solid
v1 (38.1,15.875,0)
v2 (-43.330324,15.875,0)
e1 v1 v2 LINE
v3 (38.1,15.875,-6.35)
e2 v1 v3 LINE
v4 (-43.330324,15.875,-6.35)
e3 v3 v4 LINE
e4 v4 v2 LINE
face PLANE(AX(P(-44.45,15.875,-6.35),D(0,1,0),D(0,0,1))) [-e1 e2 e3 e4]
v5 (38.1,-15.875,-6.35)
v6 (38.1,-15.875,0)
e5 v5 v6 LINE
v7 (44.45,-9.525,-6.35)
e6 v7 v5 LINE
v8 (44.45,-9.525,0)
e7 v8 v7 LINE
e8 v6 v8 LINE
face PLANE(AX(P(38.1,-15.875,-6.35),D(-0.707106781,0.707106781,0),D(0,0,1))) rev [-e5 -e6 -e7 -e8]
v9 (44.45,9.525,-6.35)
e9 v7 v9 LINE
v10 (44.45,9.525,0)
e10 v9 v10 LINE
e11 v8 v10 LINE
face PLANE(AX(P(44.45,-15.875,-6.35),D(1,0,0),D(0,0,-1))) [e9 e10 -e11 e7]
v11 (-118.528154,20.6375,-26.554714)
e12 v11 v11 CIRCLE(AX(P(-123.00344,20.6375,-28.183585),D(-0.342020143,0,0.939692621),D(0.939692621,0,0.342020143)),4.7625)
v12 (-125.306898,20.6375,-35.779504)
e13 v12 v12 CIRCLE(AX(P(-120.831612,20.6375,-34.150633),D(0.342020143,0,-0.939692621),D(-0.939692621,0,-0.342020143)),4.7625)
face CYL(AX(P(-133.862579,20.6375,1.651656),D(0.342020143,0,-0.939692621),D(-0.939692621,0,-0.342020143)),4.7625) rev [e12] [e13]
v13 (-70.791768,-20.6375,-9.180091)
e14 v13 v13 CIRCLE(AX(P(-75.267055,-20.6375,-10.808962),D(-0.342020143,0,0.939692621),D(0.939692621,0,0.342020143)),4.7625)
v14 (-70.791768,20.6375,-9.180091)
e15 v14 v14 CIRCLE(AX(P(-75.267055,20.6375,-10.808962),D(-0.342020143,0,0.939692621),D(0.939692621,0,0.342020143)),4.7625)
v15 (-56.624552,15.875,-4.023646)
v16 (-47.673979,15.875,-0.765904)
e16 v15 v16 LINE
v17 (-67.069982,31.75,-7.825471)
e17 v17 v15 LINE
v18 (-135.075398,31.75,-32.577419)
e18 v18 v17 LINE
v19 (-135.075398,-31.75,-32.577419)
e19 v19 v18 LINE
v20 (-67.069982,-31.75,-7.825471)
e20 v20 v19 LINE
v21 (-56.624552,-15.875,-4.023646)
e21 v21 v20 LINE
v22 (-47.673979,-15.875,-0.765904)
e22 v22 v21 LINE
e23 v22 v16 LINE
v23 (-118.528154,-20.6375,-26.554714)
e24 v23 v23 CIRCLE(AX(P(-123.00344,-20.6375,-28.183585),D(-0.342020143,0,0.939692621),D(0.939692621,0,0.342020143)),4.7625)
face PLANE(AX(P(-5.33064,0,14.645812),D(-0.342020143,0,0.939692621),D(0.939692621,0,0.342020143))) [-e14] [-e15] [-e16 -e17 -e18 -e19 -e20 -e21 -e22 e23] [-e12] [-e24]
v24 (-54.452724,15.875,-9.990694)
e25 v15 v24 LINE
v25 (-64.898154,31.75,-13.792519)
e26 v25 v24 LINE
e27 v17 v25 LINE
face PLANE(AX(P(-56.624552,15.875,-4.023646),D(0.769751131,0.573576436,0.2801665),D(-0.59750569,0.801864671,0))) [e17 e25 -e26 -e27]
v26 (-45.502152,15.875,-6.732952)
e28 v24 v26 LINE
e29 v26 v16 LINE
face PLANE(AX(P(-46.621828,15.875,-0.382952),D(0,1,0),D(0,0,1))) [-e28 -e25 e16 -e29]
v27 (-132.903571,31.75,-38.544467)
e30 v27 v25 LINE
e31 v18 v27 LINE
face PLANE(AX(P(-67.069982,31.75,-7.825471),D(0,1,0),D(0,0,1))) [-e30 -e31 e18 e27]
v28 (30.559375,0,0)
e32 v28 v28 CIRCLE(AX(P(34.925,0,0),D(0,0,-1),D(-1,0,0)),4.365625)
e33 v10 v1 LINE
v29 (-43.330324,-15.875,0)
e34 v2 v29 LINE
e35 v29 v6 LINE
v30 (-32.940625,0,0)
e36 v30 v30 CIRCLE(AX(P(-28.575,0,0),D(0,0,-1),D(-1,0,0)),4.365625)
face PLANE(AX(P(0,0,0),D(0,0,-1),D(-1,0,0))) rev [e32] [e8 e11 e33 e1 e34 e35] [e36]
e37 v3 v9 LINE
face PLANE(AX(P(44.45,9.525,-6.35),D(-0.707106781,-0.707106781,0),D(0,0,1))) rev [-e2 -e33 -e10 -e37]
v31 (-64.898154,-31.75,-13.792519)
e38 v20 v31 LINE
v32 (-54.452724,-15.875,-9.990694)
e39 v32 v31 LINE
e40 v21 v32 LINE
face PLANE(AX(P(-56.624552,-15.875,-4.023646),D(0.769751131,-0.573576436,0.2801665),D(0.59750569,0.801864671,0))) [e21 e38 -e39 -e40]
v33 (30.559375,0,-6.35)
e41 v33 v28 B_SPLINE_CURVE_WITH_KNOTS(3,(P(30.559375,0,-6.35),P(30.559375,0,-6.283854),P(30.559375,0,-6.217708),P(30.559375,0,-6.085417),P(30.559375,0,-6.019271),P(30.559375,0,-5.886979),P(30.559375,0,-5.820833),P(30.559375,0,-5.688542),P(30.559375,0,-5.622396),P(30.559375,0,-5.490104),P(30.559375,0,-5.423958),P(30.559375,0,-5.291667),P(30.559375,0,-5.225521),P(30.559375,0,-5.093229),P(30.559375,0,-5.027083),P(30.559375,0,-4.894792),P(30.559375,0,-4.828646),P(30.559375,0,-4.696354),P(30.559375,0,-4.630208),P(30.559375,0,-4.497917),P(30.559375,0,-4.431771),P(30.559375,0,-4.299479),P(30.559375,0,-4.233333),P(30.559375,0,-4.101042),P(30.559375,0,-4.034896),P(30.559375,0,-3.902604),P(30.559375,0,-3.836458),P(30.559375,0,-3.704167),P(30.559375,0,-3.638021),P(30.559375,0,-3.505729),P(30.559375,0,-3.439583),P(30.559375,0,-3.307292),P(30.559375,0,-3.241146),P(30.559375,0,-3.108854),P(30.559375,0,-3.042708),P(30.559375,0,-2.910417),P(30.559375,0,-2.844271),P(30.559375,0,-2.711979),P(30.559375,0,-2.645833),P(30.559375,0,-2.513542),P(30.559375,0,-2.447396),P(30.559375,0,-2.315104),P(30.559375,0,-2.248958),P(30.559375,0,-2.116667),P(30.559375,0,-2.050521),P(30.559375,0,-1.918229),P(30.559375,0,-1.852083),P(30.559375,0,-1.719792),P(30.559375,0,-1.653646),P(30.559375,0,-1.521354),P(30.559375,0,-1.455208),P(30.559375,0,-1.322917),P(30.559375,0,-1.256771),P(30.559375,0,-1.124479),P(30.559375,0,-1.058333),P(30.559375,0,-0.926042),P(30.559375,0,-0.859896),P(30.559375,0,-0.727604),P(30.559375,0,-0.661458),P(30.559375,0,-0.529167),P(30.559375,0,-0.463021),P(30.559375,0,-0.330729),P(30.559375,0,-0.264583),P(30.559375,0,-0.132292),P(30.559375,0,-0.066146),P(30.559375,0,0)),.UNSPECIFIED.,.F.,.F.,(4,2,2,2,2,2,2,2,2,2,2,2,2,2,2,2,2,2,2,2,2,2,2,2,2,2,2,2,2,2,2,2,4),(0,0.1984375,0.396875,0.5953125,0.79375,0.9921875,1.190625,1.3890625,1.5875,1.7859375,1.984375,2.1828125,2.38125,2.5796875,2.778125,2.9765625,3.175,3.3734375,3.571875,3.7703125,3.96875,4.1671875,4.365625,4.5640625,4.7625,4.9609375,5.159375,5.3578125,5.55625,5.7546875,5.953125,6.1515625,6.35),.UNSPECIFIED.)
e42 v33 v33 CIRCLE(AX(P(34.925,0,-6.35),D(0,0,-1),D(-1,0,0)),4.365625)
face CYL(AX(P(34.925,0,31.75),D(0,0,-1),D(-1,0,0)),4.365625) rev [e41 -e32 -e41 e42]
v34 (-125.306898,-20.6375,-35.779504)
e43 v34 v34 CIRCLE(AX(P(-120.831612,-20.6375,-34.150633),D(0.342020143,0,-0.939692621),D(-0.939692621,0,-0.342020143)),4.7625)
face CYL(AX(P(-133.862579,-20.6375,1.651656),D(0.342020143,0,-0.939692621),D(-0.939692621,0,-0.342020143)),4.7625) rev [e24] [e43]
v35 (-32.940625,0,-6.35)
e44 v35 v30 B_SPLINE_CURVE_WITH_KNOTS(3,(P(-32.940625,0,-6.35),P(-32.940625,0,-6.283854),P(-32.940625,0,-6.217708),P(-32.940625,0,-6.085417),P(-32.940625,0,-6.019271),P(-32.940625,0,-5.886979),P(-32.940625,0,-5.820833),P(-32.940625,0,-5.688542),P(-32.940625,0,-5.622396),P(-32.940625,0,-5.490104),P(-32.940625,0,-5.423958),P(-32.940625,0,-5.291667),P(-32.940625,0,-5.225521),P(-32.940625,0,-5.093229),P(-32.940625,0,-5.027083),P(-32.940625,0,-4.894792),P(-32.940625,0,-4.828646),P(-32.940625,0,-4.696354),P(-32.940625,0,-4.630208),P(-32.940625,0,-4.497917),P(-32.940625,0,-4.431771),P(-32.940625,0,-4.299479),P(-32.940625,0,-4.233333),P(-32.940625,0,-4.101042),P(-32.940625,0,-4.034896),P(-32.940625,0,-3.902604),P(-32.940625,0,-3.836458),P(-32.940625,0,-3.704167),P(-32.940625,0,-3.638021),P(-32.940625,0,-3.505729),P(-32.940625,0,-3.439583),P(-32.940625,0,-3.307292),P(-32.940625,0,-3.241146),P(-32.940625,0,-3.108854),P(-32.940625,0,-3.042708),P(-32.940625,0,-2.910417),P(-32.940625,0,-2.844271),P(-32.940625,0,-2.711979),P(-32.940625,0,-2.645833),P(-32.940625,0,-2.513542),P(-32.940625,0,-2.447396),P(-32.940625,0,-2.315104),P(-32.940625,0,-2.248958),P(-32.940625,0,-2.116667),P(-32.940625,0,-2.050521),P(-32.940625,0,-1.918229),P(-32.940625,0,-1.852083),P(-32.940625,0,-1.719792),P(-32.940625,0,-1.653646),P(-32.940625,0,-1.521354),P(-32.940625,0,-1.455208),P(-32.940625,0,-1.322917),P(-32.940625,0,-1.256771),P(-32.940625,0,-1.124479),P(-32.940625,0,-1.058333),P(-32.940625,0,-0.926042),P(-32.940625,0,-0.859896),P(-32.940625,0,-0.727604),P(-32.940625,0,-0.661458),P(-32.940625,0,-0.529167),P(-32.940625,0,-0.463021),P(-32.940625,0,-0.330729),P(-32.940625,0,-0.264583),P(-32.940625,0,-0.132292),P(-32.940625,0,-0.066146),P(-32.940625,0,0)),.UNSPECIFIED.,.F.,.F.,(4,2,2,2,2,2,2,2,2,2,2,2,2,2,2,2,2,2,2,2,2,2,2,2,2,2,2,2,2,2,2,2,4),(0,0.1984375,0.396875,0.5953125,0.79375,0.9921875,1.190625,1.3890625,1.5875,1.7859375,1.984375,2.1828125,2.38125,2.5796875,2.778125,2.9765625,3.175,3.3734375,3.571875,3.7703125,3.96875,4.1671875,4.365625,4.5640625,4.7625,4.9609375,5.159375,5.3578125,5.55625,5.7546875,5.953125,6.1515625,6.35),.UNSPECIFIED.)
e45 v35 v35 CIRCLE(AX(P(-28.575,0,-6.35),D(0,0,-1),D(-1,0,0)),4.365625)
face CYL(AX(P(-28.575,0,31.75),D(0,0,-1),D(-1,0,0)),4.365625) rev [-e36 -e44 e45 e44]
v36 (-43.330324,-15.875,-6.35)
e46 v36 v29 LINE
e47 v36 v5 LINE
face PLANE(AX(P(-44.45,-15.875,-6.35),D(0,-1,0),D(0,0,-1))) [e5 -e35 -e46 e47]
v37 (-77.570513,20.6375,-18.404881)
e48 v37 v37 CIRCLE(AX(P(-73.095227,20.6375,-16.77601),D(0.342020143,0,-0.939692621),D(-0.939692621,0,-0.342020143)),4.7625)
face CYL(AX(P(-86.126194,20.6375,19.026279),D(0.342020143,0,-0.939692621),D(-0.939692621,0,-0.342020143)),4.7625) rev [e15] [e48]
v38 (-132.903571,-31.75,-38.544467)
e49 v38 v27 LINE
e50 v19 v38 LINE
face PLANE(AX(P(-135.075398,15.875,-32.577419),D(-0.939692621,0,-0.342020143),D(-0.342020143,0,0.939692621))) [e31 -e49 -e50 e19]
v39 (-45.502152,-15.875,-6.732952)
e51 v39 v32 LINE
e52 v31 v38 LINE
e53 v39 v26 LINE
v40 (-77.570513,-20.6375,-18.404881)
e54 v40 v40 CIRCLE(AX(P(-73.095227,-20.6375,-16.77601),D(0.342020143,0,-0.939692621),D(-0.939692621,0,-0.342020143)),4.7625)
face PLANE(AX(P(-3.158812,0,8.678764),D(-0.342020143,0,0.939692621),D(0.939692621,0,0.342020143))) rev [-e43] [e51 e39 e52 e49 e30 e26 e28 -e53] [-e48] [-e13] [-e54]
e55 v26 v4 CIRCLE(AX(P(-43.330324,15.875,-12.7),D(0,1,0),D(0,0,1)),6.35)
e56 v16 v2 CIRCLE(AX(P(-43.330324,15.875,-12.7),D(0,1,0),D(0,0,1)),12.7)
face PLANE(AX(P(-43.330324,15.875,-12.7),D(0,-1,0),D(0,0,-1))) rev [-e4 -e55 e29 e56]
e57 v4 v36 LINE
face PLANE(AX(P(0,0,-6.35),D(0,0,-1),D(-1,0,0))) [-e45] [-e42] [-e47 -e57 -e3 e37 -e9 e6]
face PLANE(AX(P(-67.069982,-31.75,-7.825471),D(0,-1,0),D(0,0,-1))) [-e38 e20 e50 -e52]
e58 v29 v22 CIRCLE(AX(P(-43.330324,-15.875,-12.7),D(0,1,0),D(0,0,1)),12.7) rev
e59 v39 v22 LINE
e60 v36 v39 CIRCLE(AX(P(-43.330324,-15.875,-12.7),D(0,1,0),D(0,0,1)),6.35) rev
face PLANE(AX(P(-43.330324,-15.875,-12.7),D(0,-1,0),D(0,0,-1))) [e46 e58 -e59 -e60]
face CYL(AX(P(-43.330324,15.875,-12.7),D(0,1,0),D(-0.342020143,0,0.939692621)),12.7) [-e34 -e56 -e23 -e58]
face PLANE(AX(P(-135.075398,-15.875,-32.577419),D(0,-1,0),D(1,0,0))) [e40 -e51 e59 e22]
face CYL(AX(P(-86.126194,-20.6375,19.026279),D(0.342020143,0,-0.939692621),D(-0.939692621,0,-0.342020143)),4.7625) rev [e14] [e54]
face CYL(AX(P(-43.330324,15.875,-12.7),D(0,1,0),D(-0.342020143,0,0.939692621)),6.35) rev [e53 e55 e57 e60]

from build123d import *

# Parameters (mm, degrees)
SKETCH1_W                    = 88.9
SKETCH1_H                    = 31.75
BASE_FLANGE1_DEPTH           = 6.35
EDGE_FLANGE1_STRIP_CUT_DEPTH = 31.75
EDGE_FLANGE1_DEPTH           = 31.75
TAB1_DEPTH                   = 6.35
SKETCH12_R                   = 4.7625
CUT_EXTRUDE1_DEPTH           = 38.1
SKETCH13_R                   = 4.365625
CUT_EXTRUDE2_DEPTH           = 38.1
BREAK_CORNER1_START          = -6.35
BREAK_CORNER1_DEPTH          = 6.35


# Read off the part's stored shape, not the designer's step: Break-Corner1
# Sheet-metal steps are written as plain solids
with BuildPart() as part:
    # Sketch1 → Base-Flange1 (new body)
    with BuildSketch(Plane.XY):
        Rectangle(SKETCH1_W, SKETCH1_H)
    extrude(amount=-BASE_FLANGE1_DEPTH)

    # Edge-Flange1 strip (across the edge) → Edge-Flange1 strip cut (cut)
    with BuildSketch(Plane(origin=(-44.45, -15.875, -6.35), x_dir=(0.3420201433256631, 0, -0.9396926207859105), z_dir=(0, 1, 0))):
        Polygon((-18.615063745, 32.578309359), (-5.584096284, -3.223979493), (0.382951858, -1.052151583), (-12.648015603, 34.750137269), align=None)
    extrude(amount=EDGE_FLANGE1_STRIP_CUT_DEPTH, mode=Mode.SUBTRACT)

    # Edge-Flange1 section (across the edge) → Edge-Flange1 (add)
    with BuildSketch(Plane(origin=(-44.45, -15.875, -6.35), x_dir=(0.3420201433256631, 0, -0.9396926207859105), z_dir=(0, 1, 0))):
        with BuildLine():
            Line((-6.35, 1.119676327), (-6.35, 94.130323673))
            Line((-6.35, 94.130323673), (0, 94.130323673))
            Line((0, 94.130323673), (0, 1.119676327))
            ThreePointArc((0, 1.119676327), (0.096470768, 0.017010399), (0.382951858, -1.052151583))
            Line((0.382951858, -1.052151583), (-5.584096284, -3.223979493))
            ThreePointArc((-5.584096284, -3.223979493), (-6.157058463, -1.085655529), (-6.35, 1.119676327))
        make_face()
    extrude(amount=EDGE_FLANGE1_DEPTH)

    # Sketch9 → Tab1 (add)
    with BuildSketch(Plane(origin=(-3.158811591, 0, 8.678763518), x_dir=(-0.9396926207859105, 0, -0.342020143325663), z_dir=(0.342020143325663, 0, -0.9396926207859105))):
        Polygon((54.585841232, 15.875), (65.701635901, 31.75), (138.071488577, 31.75), (138.071488577, 15.875), align=None)
        Polygon((138.071488577, -31.75), (138.071488577, -15.875), (54.585841232, -15.875), (65.701635901, -31.75), align=None)
    extrude(amount=-TAB1_DEPTH)

    # Sketch12 → Cut-Extrude1 (cut)
    with BuildSketch(Plane(origin=(-3.158811591, 0, 8.678763518), x_dir=(-0.9396926207859104, 0, -0.34202014332566316), z_dir=(0.34202014332566316, 0, -0.9396926207859104))):
        with Locations((74.424778405, -20.6375)):
            Circle(SKETCH12_R)
        with Locations((125.224778405, -20.6375)):
            Circle(SKETCH12_R)
        with Locations((125.224778405, 20.6375)):
            Circle(SKETCH12_R)
        with Locations((74.424778405, 20.6375)):
            Circle(SKETCH12_R)
    extrude(amount=-CUT_EXTRUDE1_DEPTH, mode=Mode.SUBTRACT)

    # Sketch13 → Cut-Extrude2 (cut)
    with BuildSketch(Plane(origin=(0, 0, -6.35), x_dir=(-1, 0, 0), z_dir=(0, 0, -1))):
        with Locations((28.575, 0)):
            Circle(SKETCH13_R)
        with Locations((-34.925, 0)):
            Circle(SKETCH13_R)
    extrude(amount=-CUT_EXTRUDE2_DEPTH, mode=Mode.SUBTRACT)

    # Break-Corner1 outline → Break-Corner1 (cut)
    with BuildSketch(Plane.XY.offset(BREAK_CORNER1_START)):
        Polygon((44.45, -15.875), (44.45, -9.525), (38.1, -15.875), align=None)
        Polygon((38.1, 15.875), (44.45, 9.525), (44.45, 15.875), align=None)
    extrude(amount=BREAK_CORNER1_DEPTH, mode=Mode.SUBTRACT)


solid = part.part
